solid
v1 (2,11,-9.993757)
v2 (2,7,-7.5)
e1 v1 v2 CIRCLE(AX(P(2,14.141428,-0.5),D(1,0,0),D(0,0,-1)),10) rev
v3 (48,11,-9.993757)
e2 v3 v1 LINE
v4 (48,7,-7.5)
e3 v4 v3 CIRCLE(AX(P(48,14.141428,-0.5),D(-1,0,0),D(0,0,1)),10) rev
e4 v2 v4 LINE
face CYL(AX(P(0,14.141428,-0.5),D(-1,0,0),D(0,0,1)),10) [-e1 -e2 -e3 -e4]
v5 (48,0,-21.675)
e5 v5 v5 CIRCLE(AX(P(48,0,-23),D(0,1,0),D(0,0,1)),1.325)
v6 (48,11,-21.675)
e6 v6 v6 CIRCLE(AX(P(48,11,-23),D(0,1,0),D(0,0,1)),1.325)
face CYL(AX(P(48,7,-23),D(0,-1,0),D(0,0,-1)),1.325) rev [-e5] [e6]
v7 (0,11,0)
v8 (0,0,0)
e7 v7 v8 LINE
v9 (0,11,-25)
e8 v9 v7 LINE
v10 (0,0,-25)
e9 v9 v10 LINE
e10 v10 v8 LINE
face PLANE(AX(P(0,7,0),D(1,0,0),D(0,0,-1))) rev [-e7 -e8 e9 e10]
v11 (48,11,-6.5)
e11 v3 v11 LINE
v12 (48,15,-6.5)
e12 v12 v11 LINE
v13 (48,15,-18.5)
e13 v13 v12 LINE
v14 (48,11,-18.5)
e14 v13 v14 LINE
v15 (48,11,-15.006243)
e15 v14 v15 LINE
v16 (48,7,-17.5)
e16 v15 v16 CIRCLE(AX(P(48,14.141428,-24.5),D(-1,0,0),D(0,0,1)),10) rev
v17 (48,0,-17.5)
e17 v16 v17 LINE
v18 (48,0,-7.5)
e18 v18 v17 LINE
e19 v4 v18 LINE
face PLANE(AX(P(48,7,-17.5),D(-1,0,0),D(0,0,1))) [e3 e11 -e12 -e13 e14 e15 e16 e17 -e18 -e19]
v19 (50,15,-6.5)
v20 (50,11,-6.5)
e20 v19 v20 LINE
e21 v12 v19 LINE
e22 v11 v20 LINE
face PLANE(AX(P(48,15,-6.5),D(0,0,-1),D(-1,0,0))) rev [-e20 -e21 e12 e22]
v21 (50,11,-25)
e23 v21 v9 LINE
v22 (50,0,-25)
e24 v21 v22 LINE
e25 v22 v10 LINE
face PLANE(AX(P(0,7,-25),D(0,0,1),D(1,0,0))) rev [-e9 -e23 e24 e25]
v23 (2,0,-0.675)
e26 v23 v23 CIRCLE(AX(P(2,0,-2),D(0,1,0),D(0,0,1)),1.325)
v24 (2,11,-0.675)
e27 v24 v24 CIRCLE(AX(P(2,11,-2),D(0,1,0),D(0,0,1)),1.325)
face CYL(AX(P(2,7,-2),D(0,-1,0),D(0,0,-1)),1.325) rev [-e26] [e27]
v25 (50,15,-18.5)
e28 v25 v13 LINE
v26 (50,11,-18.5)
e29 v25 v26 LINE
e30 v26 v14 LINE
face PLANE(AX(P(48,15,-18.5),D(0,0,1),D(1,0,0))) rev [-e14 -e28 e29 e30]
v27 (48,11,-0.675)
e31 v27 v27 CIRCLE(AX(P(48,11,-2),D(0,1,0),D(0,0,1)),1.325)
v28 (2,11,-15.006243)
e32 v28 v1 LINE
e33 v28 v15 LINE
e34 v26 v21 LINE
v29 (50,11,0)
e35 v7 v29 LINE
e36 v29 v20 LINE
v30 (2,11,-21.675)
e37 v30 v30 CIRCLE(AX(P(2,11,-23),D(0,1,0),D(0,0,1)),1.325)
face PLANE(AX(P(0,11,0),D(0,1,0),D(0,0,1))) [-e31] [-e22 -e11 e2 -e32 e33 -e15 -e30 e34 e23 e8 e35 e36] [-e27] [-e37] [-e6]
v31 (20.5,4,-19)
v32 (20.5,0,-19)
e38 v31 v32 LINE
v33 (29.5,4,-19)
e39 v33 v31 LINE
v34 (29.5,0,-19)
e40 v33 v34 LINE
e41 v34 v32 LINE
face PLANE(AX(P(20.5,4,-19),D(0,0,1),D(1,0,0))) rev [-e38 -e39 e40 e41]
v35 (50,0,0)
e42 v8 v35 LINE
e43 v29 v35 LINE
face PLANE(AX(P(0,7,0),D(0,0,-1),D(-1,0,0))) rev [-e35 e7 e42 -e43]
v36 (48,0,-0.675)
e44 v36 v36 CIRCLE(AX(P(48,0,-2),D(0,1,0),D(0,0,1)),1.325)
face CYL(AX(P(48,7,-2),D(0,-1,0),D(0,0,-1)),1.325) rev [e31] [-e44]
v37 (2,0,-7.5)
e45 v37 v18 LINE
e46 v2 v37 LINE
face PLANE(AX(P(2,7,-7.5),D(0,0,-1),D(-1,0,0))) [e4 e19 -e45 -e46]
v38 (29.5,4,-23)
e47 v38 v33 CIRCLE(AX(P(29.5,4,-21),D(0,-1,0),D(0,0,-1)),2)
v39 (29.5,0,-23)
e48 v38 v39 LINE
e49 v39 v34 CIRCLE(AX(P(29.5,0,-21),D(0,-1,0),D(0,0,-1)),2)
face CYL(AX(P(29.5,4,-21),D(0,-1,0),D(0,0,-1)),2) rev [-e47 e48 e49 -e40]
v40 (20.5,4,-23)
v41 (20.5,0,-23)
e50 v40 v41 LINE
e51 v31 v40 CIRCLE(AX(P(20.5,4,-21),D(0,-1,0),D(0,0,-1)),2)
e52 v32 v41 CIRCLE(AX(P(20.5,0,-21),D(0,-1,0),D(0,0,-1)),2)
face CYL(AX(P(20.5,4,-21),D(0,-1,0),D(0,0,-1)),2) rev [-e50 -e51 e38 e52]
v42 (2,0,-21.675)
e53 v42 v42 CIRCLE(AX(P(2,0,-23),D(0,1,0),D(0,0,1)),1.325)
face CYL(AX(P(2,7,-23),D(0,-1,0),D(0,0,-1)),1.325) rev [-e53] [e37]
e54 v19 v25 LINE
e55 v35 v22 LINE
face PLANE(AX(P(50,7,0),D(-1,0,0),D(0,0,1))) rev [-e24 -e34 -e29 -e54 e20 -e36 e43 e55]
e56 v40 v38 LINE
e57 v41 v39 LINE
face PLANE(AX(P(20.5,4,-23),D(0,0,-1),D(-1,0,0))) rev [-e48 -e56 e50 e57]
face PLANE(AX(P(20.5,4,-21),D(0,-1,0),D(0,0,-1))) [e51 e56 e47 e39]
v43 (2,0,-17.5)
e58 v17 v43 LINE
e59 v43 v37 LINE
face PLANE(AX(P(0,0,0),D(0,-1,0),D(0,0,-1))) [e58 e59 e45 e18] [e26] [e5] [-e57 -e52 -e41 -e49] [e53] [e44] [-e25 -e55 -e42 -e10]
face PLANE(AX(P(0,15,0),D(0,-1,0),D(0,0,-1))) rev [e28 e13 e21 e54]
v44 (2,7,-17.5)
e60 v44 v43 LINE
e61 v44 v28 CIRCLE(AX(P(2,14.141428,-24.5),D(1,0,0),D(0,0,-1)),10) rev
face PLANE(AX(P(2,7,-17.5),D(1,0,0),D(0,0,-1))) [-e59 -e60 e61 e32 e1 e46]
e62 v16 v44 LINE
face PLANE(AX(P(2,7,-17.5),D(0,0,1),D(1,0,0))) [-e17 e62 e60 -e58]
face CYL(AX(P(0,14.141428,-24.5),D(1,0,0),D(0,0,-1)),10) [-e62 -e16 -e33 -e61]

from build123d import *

# Parameters (mm, degrees)
SKETCH1_W           = 50
SKETCH1_H           = 25
SKETCH1_R           = 1.325
SKETCH1_W_2         = 46
SKETCH1_H_2         = 10
BOSS_EXTRUDE1_DEPTH = 7
SKETCH2_W           = 50
SKETCH2_H           = 25
SKETCH2_R           = 1.325
SKETCH2_W_2         = 46
SKETCH2_H_2         = 4
BOSS_EXTRUDE2_DEPTH = 4
SKETCH3_W           = 2
SKETCH3_H           = 12
BOSS_EXTRUDE3_DEPTH = 4
FILLET1_R           = 10
FILLET2_R           = 10
CUT_EXTRUDE1_DEPTH  = 4


with BuildPart() as part:
    # Sketch1 → Boss-Extrude1 (new body)
    with BuildSketch(Plane(origin=(0, 0, 0), x_dir=(1, 0, 0), z_dir=(0, 1, 0))):
        with Locations((25, 12.5)):
            Rectangle(SKETCH1_W, SKETCH1_H)
        with Locations(Location((2, 23, 0), (0, 0, 270))):
            Circle(SKETCH1_R, mode=Mode.SUBTRACT)
        with Locations(Location((48, 23, 0), (0, 0, 270))):
            Circle(SKETCH1_R, mode=Mode.SUBTRACT)
        with Locations(Location((48, 2, 0), (0, 0, 270))):
            Circle(SKETCH1_R, mode=Mode.SUBTRACT)
        with Locations(Location((2, 2, 0), (0, 0, 270))):
            Circle(SKETCH1_R, mode=Mode.SUBTRACT)
        with Locations((25, 12.5)):
            Rectangle(SKETCH1_W_2, SKETCH1_H_2, mode=Mode.SUBTRACT)
    extrude(amount=BOSS_EXTRUDE1_DEPTH)

    # Sketch2 → Boss-Extrude2 (add)
    with BuildSketch(Plane(origin=(0, 7, 0), x_dir=(1, 0, 0), z_dir=(0, 1, 0))):
        with Locations((25, 12.5)):
            Rectangle(SKETCH2_W, SKETCH2_H)
        with Locations(Location((2, 23, 0), (0, 0, 270))):
            Circle(SKETCH2_R, mode=Mode.SUBTRACT)
        with Locations(Location((48, 23, 0), (0, 0, 270))):
            Circle(SKETCH2_R, mode=Mode.SUBTRACT)
        with Locations(Location((48, 2, 0), (0, 0, 270))):
            Circle(SKETCH2_R, mode=Mode.SUBTRACT)
        with Locations(Location((2, 2, 0), (0, 0, 270))):
            Circle(SKETCH2_R, mode=Mode.SUBTRACT)
        with Locations((25, 12.5)):
            Rectangle(SKETCH2_W_2, SKETCH2_H_2, mode=Mode.SUBTRACT)
    extrude(amount=BOSS_EXTRUDE2_DEPTH)

    # Sketch3 → Boss-Extrude3 (add)
    with BuildSketch(Plane(origin=(0, 11, 0), x_dir=(1, 0, 0), z_dir=(0, 1, 0))):
        with Locations((49, 12.5)):
            Rectangle(SKETCH3_W, SKETCH3_H)
    extrude(amount=BOSS_EXTRUDE3_DEPTH)

    # Fillet1
    # the kernel refuses this fillet: 10 mm, written as the material it takes off along each edge
    with BuildSketch(Plane(origin=(2, 7, -14.5), x_dir=(0, 1, 0), z_dir=(1, 0, 0))) as fillet1_piece_1:
        with BuildLine():
            CenterArc((7.141428429, -10), FILLET1_R, 90, 45.572995999)
            Line((0, -3), (0, 0))
            Line((0, 0), (7.141428429, 0))
        make_face()
    extrude(amount=46, mode=Mode.SUBTRACT)

    # Fillet2
    # the kernel refuses this fillet: 10 mm, written as the material it takes off along each edge
    with BuildSketch(Plane(origin=(48, 7, -10.5), x_dir=(0, 1, 0), z_dir=(-1, 0, 0))) as fillet2_piece_1:
        with BuildLine():
            CenterArc((7.141428429, -10), FILLET2_R, 90, 45.572995999)
            Line((0, -3), (0, 0))
            Line((0, 0), (7.141428429, 0))
        make_face()
    extrude(amount=46, mode=Mode.SUBTRACT)

    # Sketch6 → Cut-Extrude1 (cut)
    with BuildSketch(Plane(origin=(0, 0, 0), x_dir=(-1, 0, 0), z_dir=(0, -1, 0))):
        with BuildLine():
            Line((-20.5, 19), (-29.5, 19))
            ThreePointArc((-29.5, 19), (-31.5, 21), (-29.5, 23))
            Line((-29.5, 23), (-20.5, 23))
            ThreePointArc((-20.5, 23), (-18.5, 21), (-20.5, 19))
        make_face()
    extrude(amount=-CUT_EXTRUDE1_DEPTH, mode=Mode.SUBTRACT)


solid = part.part
